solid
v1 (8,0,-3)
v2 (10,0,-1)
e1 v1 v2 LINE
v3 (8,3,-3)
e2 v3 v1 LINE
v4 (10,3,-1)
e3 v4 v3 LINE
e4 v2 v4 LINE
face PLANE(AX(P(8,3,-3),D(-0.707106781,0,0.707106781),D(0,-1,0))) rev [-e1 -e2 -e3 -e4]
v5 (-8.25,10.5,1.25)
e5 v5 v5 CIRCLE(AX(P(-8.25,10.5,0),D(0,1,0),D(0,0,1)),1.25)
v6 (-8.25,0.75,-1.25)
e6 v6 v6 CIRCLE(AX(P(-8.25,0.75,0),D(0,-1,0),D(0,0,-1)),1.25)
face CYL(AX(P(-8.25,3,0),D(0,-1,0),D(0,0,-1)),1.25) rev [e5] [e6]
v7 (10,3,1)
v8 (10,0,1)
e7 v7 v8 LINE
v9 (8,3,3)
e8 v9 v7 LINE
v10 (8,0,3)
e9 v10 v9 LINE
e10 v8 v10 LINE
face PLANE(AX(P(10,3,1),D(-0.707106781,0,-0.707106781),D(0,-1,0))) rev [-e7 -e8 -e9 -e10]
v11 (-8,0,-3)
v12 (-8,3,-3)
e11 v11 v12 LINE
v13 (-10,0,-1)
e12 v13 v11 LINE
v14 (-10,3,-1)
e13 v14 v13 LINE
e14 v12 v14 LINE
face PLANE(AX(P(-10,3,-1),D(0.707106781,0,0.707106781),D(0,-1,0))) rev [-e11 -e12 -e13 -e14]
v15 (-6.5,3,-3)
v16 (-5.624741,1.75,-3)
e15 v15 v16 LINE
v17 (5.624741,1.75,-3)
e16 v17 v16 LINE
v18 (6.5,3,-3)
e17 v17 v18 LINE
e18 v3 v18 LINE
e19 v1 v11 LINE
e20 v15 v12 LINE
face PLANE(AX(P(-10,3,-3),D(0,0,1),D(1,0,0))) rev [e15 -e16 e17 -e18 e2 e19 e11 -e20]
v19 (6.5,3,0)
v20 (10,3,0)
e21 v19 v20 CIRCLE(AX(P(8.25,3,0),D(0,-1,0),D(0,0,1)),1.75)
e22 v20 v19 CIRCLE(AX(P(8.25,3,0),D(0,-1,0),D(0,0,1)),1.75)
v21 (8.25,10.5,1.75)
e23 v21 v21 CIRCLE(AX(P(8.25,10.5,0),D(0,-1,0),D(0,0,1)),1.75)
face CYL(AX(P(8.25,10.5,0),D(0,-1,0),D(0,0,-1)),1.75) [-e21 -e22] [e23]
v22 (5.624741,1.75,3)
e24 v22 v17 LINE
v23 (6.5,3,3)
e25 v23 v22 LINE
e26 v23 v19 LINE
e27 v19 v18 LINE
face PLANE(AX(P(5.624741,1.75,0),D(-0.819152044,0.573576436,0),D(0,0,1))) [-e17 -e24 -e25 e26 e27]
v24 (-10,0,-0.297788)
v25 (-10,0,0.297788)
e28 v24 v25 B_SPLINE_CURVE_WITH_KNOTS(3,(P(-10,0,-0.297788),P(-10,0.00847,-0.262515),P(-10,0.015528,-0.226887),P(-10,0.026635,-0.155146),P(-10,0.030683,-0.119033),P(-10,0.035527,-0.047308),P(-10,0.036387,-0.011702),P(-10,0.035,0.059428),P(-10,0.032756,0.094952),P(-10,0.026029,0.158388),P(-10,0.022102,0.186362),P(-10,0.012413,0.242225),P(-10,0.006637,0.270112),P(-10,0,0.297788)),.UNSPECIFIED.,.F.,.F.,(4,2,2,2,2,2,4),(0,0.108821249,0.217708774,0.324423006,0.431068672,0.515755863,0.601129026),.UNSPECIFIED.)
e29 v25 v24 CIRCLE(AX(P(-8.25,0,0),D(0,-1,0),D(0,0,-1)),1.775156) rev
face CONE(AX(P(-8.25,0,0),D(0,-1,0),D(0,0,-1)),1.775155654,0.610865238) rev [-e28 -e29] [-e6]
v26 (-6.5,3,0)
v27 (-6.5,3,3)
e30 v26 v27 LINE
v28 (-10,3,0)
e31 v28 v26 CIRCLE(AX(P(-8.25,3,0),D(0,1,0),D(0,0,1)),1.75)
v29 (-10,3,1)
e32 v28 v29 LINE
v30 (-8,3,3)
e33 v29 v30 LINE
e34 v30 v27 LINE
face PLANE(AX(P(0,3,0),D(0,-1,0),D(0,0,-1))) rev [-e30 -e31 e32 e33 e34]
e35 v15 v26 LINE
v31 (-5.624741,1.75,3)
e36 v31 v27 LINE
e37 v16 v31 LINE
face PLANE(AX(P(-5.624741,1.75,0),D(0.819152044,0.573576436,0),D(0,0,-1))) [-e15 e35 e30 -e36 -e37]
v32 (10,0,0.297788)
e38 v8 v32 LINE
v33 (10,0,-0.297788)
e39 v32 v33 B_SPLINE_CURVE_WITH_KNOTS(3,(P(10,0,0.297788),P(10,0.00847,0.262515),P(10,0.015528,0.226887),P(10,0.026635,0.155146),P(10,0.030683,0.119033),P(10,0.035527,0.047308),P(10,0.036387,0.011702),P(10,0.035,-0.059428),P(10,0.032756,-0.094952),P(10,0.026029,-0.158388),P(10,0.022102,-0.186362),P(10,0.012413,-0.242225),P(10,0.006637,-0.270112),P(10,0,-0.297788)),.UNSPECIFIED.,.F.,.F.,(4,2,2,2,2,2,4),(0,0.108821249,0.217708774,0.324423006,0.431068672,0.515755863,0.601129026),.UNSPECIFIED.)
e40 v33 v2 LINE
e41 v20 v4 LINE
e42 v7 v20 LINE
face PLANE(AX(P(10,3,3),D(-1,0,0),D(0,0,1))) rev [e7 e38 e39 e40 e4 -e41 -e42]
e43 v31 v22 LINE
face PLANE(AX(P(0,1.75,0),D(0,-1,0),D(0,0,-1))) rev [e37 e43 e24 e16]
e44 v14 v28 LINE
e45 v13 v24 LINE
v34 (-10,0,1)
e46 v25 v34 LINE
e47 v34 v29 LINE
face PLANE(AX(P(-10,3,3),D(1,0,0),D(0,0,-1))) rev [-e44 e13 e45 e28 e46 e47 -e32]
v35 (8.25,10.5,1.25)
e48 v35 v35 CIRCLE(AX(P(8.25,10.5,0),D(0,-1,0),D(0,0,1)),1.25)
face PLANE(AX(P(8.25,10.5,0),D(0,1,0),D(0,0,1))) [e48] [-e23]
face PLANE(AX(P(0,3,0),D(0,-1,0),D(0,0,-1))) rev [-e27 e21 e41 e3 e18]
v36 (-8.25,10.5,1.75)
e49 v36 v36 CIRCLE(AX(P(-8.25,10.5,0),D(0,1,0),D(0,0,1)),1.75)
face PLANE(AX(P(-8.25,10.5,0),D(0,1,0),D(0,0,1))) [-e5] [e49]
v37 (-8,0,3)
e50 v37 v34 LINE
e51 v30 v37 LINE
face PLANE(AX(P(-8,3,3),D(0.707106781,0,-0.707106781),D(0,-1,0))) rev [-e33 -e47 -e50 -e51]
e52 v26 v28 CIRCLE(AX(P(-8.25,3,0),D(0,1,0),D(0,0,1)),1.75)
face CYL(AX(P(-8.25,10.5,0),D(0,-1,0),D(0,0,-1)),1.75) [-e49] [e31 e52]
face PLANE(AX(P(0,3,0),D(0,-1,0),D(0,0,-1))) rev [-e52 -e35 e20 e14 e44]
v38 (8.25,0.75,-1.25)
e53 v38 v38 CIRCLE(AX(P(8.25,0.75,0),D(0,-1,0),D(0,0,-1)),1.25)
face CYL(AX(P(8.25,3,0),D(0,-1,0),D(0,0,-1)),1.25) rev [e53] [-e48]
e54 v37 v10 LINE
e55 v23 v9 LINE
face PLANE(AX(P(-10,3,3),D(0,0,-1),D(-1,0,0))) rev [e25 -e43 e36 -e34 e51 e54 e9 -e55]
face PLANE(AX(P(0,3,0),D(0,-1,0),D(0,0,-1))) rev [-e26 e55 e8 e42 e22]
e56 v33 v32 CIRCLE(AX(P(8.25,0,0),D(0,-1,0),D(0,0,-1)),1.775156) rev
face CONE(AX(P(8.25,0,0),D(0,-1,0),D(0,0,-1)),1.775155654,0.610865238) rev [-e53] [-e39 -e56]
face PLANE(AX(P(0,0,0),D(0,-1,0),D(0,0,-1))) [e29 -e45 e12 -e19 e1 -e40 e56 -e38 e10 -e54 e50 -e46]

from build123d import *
from OCP.BRepFilletAPI import BRepFilletAPI_MakeChamfer

# Parameters (mm, degrees)
SKETCH1_W           = 20
SKETCH1_H           = 6
SKETCH1_R           = 1.25
BOSS_EXTRUDE1_DEPTH = 3
SKETCH2_W           = 13
SKETCH2_H           = 6
CUT_EXTRUDE1_DEPTH  = 1.25
CHAMFER1_SIZE       = 2
SKETCH3_R           = 1.75
SKETCH3_R_2         = 1.25
BOSS_EXTRUDE2_DEPTH = 7.5
CHAMFER2_SIZE       = 0.525155654
CHAMFER2_SIZE_2     = 0.75
CHAMFER3_SIZE       = 1.25
CHAMFER3_SIZE_2     = 0.875259423


# Some blends are built 0.0001 mm under size
with BuildPart() as part:
    # Sketch1 → Boss-Extrude1 (new body)
    with BuildSketch(Plane(origin=(0, 0, 0), x_dir=(1, 0, 0), z_dir=(0, 1, 0))):
        Rectangle(SKETCH1_W, SKETCH1_H)
        with Locations(Location((-8.25, 0, 0), (0, 0, 270))):
            Circle(SKETCH1_R, mode=Mode.SUBTRACT)
        with Locations(Location((8.25, 0, 0), (0, 0, 90))):
            Circle(SKETCH1_R, mode=Mode.SUBTRACT)
    extrude(amount=BOSS_EXTRUDE1_DEPTH)

    # Sketch2 → Cut-Extrude1 (cut)
    with BuildSketch(Plane(origin=(0, 3, 0), x_dir=(1, 0, 0), z_dir=(0, 1, 0))):
        Rectangle(SKETCH2_W, SKETCH2_H)
    extrude(amount=-CUT_EXTRUDE1_DEPTH, mode=Mode.SUBTRACT)

    # Chamfer1
    chamfer1_edges = [part.edges().sort_by_distance(p)[0] for p in [
        (10, 1.5, 3),
        (-10, 1.5, 3),
        (-10, 1.5, -3),
        (10, 1.5, -3),
    ]]
    chamfer(chamfer1_edges, length=CHAMFER1_SIZE)

    # Sketch3 → Boss-Extrude2 (add)
    with BuildSketch(Plane(origin=(0, 3, 0), x_dir=(1, 0, 0), z_dir=(0, 1, 0))):
        with Locations(Location((-8.25, 0, 0), (0, 0, 180))):
            Circle(SKETCH3_R)
        with Locations(Location((-8.25, 0, 0), (0, 0, 270))):
            Circle(SKETCH3_R_2, mode=Mode.SUBTRACT)
    boss_extrude2 = extrude(amount=BOSS_EXTRUDE2_DEPTH)

    # Mirror1: Boss-Extrude2 across plane
    add(boss_extrude2.mirror(Plane(origin=(0, 0, 0), x_dir=(0, 0, 1), z_dir=(1, 0, 0))))

    # Chamfer2
    # the kernel refuses this chamfer: 0.75, 0.525155654 mm, written as the material it takes off along each edge
    with BuildSketch(Plane(origin=(-8.25, 0, 0), x_dir=(0, 0, 1), z_dir=(-1, 0, 0))) as chamfer2_piece_1:
        Polygon((1.25 + CHAMFER2_SIZE, 0), (1.25, CHAMFER2_SIZE_2), (1.25, 0), align=None)
    revolve(axis=Axis((-8.25, 0, 0), (0, 1, 0)), mode=Mode.SUBTRACT)
    with BuildSketch(Plane(origin=(8.25, 0, 0), x_dir=(0, 0, -1), z_dir=(1, 0, 0))) as chamfer2_piece_2:
        Polygon((1.25 + CHAMFER2_SIZE, 0), (1.25, CHAMFER2_SIZE_2), (1.25, 0), align=None)
    revolve(axis=Axis((8.25, 0, 0), (0, 1, 0)), mode=Mode.SUBTRACT)

    # Chamfer3
    chamfer3_edges_1 = [part.edges().sort_by_distance(p)[0] for p in [
        (6.5, 1.75, 0),
    ]]
    chamfer3_side_1 = [part.faces().sort_by_distance(p)[0] for p in [
        (6.5, 1.767505188, 0),
    ]]
    chamfer3_edges_2 = [part.edges().sort_by_distance(p)[0] for p in [
        (-6.5, 1.75, 0),
    ]]
    chamfer3_side_2 = [part.faces().sort_by_distance(p)[0] for p in [
        (-6.5, 1.767505188, 0),
    ]]
    chamfer3 = BRepFilletAPI_MakeChamfer(part.part.solid().wrapped)
    for e in chamfer3_edges_1:
        chamfer3.Add(CHAMFER3_SIZE - 0.0001, CHAMFER3_SIZE_2 - 0.0001, e.wrapped, chamfer3_side_1[0].wrapped)
    for e in chamfer3_edges_2:
        chamfer3.Add(CHAMFER3_SIZE - 0.0001, CHAMFER3_SIZE_2 - 0.0001, e.wrapped, chamfer3_side_2[0].wrapped)
    add(Compound.cast(chamfer3.Shape()), mode=Mode.REPLACE)  # a hair under: the kernel refuses the full size


solid = part.part
